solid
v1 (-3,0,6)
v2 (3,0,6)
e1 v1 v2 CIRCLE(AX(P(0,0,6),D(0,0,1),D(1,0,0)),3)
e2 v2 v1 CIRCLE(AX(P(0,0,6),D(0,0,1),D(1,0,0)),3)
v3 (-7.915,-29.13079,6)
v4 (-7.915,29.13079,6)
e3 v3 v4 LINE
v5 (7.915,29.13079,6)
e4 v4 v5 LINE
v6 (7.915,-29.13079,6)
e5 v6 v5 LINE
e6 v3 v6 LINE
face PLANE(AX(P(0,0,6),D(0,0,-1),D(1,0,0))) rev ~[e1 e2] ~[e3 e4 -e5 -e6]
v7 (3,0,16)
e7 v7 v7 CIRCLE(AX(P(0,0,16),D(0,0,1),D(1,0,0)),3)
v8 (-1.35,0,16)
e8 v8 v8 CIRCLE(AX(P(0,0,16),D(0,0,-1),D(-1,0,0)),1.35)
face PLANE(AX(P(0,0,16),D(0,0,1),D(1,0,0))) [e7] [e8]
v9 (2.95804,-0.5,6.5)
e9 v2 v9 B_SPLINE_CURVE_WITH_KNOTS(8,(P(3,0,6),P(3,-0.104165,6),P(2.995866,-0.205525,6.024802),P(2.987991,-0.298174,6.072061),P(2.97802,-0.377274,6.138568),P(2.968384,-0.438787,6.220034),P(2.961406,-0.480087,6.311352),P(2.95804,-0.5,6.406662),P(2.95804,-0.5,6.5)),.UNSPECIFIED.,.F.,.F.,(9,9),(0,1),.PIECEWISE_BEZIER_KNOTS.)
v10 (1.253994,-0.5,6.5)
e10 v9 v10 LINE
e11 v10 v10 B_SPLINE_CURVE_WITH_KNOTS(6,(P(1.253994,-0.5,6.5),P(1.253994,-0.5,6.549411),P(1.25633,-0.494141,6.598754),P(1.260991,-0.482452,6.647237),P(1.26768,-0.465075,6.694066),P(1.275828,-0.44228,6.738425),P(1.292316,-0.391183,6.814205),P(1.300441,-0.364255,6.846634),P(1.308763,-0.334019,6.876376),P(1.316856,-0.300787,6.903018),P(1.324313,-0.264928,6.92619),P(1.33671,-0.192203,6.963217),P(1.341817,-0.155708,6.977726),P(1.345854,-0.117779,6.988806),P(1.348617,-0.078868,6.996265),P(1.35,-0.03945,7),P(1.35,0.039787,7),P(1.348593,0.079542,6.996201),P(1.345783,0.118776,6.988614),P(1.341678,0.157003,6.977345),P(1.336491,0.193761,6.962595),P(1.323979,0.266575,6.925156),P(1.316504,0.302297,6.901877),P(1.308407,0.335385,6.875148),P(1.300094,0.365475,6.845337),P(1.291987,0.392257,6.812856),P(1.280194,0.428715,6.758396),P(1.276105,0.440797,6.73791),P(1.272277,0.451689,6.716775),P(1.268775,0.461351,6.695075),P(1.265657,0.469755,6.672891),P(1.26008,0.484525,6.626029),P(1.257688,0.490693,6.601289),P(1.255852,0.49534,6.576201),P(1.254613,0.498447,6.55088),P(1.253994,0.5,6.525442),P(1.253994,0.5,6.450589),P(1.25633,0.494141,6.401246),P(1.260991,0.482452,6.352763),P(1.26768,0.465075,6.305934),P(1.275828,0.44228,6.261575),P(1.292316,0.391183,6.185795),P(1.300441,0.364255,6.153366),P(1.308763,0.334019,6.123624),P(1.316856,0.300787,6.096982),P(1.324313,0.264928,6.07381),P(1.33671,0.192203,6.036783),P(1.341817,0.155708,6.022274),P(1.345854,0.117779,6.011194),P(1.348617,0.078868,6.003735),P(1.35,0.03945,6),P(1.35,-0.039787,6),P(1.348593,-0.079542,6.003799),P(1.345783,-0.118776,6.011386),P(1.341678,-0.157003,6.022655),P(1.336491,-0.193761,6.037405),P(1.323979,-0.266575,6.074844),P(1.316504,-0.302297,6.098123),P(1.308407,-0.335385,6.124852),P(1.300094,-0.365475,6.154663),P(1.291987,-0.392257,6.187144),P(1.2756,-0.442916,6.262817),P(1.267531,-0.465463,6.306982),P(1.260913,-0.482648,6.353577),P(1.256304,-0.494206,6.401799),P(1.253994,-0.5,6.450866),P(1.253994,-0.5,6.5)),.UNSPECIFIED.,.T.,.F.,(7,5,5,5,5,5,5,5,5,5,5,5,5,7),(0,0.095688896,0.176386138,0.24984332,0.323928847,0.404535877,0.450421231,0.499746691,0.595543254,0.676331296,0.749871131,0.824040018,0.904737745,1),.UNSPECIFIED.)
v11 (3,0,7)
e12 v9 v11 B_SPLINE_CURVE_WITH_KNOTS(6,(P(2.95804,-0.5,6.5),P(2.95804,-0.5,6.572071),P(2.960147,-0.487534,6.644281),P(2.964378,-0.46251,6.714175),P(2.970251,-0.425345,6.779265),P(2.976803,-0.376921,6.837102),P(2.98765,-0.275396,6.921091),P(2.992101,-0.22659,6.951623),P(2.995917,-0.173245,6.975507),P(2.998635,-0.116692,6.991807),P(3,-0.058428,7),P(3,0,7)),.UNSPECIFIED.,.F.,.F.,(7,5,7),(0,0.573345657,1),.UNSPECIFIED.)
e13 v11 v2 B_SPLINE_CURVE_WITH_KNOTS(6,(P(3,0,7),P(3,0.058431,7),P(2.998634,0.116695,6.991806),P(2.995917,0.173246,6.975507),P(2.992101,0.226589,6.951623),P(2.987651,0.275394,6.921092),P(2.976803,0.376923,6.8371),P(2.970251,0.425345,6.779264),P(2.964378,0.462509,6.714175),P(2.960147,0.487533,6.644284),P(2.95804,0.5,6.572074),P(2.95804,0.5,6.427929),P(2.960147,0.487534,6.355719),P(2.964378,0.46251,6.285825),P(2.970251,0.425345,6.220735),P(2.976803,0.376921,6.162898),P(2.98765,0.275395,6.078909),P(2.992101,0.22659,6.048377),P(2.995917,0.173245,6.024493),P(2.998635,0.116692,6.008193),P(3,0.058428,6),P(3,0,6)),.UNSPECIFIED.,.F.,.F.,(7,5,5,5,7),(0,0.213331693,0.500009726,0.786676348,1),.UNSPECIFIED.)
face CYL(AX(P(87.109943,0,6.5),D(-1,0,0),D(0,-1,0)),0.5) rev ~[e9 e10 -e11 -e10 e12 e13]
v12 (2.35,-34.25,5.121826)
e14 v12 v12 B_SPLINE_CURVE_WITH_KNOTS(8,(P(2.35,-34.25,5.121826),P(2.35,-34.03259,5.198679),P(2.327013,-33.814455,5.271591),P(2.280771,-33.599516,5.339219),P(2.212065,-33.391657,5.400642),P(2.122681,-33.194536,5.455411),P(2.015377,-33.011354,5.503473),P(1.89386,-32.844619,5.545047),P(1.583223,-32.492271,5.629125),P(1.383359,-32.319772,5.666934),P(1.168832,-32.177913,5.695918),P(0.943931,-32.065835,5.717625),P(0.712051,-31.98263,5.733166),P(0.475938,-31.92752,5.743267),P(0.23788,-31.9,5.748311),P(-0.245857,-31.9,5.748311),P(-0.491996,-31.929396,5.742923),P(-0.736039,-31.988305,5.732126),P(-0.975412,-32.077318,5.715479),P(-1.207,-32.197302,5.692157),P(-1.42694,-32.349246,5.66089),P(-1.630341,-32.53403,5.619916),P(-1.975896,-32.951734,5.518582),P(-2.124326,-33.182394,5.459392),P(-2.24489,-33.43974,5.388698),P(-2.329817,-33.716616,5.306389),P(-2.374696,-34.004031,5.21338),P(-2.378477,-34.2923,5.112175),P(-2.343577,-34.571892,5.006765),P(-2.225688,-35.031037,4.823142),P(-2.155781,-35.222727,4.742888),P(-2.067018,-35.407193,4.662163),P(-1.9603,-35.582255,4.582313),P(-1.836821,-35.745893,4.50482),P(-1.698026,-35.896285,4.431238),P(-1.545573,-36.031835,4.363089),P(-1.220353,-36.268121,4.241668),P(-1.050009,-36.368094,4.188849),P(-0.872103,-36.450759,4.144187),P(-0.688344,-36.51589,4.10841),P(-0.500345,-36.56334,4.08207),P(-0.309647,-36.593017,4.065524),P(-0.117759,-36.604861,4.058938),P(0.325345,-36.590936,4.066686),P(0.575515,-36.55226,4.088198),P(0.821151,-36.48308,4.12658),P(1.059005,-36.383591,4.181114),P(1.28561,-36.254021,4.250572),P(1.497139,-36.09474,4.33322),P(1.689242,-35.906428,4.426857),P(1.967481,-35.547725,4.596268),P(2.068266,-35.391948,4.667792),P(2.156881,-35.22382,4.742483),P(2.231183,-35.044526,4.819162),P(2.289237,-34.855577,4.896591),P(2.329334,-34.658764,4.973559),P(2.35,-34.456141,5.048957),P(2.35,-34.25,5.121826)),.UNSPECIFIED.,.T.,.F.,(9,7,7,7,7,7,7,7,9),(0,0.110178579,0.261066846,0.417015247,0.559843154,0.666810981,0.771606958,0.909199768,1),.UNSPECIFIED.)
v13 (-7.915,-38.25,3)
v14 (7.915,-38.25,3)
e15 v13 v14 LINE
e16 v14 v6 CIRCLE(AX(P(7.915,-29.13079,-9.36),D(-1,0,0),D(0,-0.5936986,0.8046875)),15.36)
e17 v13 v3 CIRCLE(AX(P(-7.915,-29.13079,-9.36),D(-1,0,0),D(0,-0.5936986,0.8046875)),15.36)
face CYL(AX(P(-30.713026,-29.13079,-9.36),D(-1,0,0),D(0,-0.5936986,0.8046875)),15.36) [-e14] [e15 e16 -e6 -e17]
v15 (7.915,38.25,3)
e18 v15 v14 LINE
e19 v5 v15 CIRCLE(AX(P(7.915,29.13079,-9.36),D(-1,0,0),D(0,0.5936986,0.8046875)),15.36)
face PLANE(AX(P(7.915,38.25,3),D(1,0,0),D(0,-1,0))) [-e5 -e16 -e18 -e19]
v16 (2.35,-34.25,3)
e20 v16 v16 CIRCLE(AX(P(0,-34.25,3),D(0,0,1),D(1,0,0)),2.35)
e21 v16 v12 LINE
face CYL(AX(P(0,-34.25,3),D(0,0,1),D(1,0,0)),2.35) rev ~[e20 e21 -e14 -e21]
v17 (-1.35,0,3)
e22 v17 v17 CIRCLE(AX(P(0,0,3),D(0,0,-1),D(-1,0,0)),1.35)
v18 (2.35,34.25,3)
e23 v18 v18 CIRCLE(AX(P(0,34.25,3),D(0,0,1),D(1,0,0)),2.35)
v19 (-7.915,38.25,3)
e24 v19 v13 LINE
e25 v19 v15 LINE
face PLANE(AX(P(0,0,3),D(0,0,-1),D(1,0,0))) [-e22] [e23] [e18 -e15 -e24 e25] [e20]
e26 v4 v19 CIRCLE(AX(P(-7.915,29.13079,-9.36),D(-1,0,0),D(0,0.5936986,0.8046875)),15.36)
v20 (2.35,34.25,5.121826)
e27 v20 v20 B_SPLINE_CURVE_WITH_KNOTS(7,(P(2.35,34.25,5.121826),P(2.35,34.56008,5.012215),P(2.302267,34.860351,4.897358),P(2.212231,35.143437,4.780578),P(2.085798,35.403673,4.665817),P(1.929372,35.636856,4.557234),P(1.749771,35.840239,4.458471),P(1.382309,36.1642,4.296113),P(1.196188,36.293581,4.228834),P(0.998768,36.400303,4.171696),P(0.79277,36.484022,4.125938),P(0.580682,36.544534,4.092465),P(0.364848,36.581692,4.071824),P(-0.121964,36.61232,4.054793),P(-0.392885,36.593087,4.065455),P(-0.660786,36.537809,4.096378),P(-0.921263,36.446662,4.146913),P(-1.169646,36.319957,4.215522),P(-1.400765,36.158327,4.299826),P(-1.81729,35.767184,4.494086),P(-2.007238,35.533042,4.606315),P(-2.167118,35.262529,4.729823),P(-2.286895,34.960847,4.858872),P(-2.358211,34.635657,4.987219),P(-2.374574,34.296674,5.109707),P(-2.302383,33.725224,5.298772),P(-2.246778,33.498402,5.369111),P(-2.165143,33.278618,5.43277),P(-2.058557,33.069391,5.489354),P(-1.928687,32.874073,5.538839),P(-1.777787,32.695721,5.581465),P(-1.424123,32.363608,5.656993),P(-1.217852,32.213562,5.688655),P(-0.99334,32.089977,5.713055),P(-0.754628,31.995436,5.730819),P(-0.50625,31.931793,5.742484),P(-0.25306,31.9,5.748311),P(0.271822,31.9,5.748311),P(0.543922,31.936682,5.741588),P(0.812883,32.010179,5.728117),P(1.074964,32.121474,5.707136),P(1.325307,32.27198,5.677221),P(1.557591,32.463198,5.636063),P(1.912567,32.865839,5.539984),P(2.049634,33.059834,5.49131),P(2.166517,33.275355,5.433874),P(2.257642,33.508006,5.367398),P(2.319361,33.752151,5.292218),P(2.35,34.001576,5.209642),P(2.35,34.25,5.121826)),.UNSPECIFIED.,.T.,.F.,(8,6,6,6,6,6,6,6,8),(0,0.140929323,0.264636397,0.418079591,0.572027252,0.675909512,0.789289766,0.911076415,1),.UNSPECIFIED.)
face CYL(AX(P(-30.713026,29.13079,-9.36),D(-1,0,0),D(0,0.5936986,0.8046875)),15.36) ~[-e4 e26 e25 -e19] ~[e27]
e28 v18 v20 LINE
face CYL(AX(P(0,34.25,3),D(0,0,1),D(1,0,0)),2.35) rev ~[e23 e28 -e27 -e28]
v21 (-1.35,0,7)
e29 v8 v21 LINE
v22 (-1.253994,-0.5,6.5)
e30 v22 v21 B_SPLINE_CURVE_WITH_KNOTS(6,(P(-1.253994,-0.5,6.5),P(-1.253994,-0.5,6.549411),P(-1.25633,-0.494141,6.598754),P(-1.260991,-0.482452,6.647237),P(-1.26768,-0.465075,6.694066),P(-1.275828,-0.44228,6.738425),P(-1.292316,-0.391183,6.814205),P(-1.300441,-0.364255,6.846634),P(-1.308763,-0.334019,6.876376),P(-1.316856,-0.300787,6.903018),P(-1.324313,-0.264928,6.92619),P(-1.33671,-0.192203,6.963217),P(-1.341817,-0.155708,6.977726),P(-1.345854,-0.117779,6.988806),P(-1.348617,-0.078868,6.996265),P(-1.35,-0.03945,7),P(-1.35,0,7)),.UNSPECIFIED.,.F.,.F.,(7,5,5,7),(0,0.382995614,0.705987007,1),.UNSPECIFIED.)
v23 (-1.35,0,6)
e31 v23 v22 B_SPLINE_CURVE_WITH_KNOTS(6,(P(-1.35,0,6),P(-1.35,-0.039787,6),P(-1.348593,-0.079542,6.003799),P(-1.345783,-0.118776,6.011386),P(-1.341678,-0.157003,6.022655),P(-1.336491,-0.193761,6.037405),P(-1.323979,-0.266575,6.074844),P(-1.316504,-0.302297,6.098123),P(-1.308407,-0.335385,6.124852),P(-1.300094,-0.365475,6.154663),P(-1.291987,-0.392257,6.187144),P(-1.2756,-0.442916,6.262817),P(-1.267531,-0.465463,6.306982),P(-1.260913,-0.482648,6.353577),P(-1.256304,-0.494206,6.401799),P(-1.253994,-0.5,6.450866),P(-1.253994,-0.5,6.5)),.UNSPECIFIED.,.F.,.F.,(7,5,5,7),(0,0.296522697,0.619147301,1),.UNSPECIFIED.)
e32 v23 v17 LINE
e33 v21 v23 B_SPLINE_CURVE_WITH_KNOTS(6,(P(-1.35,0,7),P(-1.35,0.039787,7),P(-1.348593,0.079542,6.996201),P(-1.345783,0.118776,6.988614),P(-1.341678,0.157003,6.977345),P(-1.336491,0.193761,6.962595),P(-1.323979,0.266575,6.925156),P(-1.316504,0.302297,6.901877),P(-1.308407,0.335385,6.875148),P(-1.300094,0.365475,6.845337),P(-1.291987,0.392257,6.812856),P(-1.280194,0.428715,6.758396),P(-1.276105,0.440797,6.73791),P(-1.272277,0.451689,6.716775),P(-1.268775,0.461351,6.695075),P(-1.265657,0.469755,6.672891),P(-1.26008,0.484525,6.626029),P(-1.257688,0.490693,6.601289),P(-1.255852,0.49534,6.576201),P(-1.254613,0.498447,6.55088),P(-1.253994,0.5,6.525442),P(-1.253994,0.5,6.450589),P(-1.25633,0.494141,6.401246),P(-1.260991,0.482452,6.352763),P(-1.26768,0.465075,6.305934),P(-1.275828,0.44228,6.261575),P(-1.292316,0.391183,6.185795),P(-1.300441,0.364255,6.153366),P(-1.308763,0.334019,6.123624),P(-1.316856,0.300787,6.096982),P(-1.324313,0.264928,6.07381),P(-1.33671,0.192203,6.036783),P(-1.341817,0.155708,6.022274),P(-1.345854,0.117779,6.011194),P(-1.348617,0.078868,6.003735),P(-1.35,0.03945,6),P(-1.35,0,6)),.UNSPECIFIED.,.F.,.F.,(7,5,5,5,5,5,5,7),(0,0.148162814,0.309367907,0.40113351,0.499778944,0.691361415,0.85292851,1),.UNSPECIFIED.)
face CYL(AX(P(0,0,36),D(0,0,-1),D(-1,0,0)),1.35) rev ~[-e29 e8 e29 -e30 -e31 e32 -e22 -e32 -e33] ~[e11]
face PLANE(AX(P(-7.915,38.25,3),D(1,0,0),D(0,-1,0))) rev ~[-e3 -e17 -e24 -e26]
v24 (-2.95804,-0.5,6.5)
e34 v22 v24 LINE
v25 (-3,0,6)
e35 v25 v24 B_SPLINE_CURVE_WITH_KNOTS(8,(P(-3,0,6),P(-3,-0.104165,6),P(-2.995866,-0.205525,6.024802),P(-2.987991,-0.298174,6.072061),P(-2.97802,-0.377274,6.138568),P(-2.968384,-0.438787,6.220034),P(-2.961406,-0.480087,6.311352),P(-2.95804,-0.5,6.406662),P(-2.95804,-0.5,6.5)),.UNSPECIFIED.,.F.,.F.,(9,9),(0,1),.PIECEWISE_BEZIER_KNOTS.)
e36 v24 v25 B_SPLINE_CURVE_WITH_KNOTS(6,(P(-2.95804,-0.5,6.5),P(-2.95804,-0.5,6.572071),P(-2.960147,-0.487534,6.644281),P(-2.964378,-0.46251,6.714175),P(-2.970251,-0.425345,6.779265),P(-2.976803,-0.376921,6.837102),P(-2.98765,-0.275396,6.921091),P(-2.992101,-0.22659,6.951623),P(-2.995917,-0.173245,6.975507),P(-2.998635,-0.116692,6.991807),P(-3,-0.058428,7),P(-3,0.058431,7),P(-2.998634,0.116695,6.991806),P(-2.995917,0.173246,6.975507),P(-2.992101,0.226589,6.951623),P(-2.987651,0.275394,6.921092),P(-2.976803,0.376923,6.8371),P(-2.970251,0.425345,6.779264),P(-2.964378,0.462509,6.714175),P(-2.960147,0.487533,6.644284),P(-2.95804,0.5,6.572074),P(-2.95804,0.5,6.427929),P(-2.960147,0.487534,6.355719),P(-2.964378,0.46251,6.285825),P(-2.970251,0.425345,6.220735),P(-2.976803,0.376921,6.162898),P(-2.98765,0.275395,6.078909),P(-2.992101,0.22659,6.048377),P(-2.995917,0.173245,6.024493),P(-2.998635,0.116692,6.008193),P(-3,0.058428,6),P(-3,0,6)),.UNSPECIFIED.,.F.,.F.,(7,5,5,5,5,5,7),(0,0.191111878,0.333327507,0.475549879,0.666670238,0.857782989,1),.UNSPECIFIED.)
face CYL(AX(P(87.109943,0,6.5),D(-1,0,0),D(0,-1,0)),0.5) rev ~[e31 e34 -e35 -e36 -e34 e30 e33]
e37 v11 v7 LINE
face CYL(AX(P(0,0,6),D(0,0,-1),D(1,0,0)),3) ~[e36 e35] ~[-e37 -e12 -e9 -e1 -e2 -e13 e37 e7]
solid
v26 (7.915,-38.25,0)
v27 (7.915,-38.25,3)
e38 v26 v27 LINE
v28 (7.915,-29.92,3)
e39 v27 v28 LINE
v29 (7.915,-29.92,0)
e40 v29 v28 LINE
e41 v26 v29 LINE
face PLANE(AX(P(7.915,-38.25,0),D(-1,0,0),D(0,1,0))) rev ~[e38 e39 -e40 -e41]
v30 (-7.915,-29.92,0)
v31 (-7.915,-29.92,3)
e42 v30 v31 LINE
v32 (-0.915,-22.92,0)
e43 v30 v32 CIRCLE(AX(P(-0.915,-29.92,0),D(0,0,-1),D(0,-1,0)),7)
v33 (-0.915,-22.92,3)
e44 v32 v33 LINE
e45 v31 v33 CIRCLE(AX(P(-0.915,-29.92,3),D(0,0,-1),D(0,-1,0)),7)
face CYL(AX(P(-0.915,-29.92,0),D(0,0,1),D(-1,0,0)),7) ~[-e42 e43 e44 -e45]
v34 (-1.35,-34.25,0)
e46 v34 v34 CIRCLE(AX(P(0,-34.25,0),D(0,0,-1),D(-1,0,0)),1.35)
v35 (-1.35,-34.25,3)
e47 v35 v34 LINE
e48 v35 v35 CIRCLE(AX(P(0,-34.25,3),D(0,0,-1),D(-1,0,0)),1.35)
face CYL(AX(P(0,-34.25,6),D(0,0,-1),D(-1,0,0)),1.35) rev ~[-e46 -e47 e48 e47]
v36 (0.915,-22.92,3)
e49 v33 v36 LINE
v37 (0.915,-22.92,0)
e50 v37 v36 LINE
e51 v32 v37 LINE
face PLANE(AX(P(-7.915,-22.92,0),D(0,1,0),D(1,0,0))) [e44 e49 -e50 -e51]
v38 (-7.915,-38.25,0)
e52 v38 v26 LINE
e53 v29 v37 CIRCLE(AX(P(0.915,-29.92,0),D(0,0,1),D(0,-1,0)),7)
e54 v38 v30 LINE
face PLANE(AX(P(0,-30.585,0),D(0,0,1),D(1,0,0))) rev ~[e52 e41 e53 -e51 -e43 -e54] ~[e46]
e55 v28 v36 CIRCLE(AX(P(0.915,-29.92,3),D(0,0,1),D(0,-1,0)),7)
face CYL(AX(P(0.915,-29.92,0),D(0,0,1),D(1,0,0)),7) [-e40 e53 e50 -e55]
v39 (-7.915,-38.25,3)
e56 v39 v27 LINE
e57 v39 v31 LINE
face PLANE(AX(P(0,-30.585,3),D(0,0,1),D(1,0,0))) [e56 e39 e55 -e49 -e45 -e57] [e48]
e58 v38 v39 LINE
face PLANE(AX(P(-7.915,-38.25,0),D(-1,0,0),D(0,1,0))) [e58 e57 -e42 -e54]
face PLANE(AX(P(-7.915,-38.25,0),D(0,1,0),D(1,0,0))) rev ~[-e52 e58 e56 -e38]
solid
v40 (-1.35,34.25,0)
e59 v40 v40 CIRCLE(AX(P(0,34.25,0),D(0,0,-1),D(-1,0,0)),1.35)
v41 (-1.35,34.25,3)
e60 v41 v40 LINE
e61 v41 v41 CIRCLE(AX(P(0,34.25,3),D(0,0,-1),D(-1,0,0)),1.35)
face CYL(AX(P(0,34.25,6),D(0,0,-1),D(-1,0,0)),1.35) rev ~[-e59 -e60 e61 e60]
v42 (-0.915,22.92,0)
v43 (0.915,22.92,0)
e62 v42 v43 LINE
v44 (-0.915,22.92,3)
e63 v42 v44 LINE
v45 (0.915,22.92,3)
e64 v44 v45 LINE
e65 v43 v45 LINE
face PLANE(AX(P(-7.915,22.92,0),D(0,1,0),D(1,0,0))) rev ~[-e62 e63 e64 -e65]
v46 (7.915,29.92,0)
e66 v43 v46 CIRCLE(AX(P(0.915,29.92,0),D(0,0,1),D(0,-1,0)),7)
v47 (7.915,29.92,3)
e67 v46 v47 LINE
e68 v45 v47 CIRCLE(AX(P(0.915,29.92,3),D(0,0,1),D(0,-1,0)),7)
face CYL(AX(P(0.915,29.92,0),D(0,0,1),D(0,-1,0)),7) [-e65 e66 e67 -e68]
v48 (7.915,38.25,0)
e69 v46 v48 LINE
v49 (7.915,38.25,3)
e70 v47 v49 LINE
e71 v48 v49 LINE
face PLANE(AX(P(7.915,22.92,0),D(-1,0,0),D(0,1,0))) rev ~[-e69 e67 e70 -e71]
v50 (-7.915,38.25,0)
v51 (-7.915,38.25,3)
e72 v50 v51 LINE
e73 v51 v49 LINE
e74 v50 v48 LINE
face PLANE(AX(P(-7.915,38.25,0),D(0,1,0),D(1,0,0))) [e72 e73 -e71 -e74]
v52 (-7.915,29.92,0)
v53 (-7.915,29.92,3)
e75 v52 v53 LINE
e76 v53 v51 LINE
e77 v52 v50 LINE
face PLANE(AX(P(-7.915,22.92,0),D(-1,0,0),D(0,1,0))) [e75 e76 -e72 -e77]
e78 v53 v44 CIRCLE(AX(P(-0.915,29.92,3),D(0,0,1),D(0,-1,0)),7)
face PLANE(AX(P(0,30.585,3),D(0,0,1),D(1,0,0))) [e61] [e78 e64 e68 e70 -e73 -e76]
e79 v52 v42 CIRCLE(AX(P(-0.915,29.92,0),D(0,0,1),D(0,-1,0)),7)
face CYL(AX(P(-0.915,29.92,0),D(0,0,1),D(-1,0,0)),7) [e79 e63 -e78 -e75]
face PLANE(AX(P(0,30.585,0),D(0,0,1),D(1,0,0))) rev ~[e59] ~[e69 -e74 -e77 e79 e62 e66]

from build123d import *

# Parameters (mm, degrees)
F0_W              = 15.83
F0_H              = 15.33
F1_DEPTH          = 3
F2_R              = 7
F2_2_R            = 7
F5_W              = 15.83
F5_H              = 76.5
F6_DEPTH          = 3
F7_T1_DEPTH       = 61.4260524607
F11_D             = 2.7
F11_DEPTH         = 10
F11_CBORE_D       = 4.7
F11_CBORE_DEPTH   = 3
F11_TIP           = 0.8111618357
F11_2_D           = 2.7
F11_2_DEPTH       = 10
F11_2_CBORE_D     = 4.7
F11_2_CBORE_DEPTH = 3
F11_2_TIP         = 0.8111618357
F11_3_D           = 2.7
F11_3_DEPTH       = 10
F11_3_CBORE_D     = 4.7
F11_3_CBORE_DEPTH = 3
F11_3_TIP         = 0.8111618357
F12_R             = 3
F13_DEPTH         = 10
F15_D             = 2.7
F15_DEPTH         = 20
F15_TIP           = 0.8111618357
F17_D             = 1


# Not quite as in the source:
# - a fillet or chamfer that OpenCascade refuses, or shapes differently, is made with other operations: its cross-section is extruded or revolved along the edge and cut away or added


with BuildPart() as f1:
    # F0 (on Top) → F1 (new body)
    with BuildSketch(Plane.XY):
        with Locations((0, 30.585)):
            Rectangle(F0_W, F0_H)
    extrude(amount=F1_DEPTH)

    # F2
    f2_edges = [f1.edges().sort_by_distance(p)[0] for p in [
        (-7.915, 22.92, 1.5),
        (7.915, 22.92, 1.5),
    ]]
    fillet(f2_edges, radius=F2_R)

    # F11
    with Locations(Plane.XY.offset(6)):
        with Locations((0, 34.25), (0, -34.25)):
            CounterBoreHole(F11_D / 2, F11_CBORE_D / 2, F11_CBORE_DEPTH, depth=F11_DEPTH)
            with Locations((0, 0, -(F11_DEPTH + F11_TIP / 2))):  # 118° drill point
                Cone(0, F11_D / 2, F11_TIP, mode=Mode.SUBTRACT)


with BuildPart() as f1b:
    # F0 (on Top) → F1, piece 2 (new body)
    with BuildSketch(Plane.XY):
        with Locations((0, -30.585)):
            Rectangle(F0_W, F0_H)
    extrude(amount=F1_DEPTH)

    # F2#2
    f2_2_edges = [f1b.edges().sort_by_distance(p)[0] for p in [
        (-7.915, -22.92, 1.5),
        (7.915, -22.92, 1.5),
    ]]
    fillet(f2_2_edges, radius=F2_2_R)

    # F11#2
    with Locations(Plane.XY.offset(6)):
        with Locations((0, 34.25), (0, -34.25)):
            CounterBoreHole(F11_2_D / 2, F11_2_CBORE_D / 2, F11_2_CBORE_DEPTH, depth=F11_2_DEPTH)
            with Locations((0, 0, -(F11_2_DEPTH + F11_2_TIP / 2))):  # 118° drill point
                Cone(0, F11_2_D / 2, F11_2_TIP, mode=Mode.SUBTRACT)


with BuildPart() as f6:
    # F5 (on face) → F6 (new body)
    with BuildSketch(Plane(origin=(0, 0, 3), x_dir=(1, 0, 0), z_dir=(0, 0, -1))):
        Rectangle(F5_W, F5_H)
    extrude(amount=-F6_DEPTH)

    # F7: fillet of radius 15.36 on 2 edges, made by hand

    # F7_s2 → F7_t1 (cut)
    with BuildSketch(Plane.YZ.offset(-30.7130262304)):
        with BuildLine():
            ThreePointArc((38.25, 3), (33.9307895079, 5.2307367874), (29.1307895079, 6))
            Line((29.1307895079, 6), (38.25, 6))
            Line((38.25, 6), (38.25, 3))
        make_face()
        with BuildLine():
            ThreePointArc((-38.25, 3), (-33.9307895079, 5.2307367874), (-29.1307895079, 6))
            Line((-29.1307895079, 6), (-38.25, 6))
            Line((-38.25, 6), (-38.25, 3))
        make_face()
    extrude(amount=F7_T1_DEPTH, mode=Mode.SUBTRACT)

    # F11#3
    with Locations(Plane.XY.offset(6)):
        with Locations((0, 34.25), (0, -34.25)):
            CounterBoreHole(F11_3_D / 2, F11_3_CBORE_D / 2, F11_3_CBORE_DEPTH, depth=F11_3_DEPTH)
            with Locations((0, 0, -(F11_3_DEPTH + F11_3_TIP / 2))):  # 118° drill point
                Cone(0, F11_3_D / 2, F11_3_TIP, mode=Mode.SUBTRACT)

    # F12 (on face) → F13 (join)
    with BuildSketch(Plane.XY.offset(6)):
        Circle(F12_R)
    extrude(amount=F13_DEPTH)

    # F15
    with Locations(Plane.XY.offset(16)):
        with Locations((0, 0)):
            Hole(F15_D / 2, depth=F15_DEPTH)
            with Locations((0, 0, -(F15_DEPTH + F15_TIP / 2))):  # 118° drill point
                Cone(0, F15_D / 2, F15_TIP, mode=Mode.SUBTRACT)

    # F17 (through all)
    with Locations(Plane.YZ.offset(7.915)):
        with Locations((0, 6.5)):
            Hole(F17_D / 2)


solid = Compound([f1.part, f1b.part, f6.part])
